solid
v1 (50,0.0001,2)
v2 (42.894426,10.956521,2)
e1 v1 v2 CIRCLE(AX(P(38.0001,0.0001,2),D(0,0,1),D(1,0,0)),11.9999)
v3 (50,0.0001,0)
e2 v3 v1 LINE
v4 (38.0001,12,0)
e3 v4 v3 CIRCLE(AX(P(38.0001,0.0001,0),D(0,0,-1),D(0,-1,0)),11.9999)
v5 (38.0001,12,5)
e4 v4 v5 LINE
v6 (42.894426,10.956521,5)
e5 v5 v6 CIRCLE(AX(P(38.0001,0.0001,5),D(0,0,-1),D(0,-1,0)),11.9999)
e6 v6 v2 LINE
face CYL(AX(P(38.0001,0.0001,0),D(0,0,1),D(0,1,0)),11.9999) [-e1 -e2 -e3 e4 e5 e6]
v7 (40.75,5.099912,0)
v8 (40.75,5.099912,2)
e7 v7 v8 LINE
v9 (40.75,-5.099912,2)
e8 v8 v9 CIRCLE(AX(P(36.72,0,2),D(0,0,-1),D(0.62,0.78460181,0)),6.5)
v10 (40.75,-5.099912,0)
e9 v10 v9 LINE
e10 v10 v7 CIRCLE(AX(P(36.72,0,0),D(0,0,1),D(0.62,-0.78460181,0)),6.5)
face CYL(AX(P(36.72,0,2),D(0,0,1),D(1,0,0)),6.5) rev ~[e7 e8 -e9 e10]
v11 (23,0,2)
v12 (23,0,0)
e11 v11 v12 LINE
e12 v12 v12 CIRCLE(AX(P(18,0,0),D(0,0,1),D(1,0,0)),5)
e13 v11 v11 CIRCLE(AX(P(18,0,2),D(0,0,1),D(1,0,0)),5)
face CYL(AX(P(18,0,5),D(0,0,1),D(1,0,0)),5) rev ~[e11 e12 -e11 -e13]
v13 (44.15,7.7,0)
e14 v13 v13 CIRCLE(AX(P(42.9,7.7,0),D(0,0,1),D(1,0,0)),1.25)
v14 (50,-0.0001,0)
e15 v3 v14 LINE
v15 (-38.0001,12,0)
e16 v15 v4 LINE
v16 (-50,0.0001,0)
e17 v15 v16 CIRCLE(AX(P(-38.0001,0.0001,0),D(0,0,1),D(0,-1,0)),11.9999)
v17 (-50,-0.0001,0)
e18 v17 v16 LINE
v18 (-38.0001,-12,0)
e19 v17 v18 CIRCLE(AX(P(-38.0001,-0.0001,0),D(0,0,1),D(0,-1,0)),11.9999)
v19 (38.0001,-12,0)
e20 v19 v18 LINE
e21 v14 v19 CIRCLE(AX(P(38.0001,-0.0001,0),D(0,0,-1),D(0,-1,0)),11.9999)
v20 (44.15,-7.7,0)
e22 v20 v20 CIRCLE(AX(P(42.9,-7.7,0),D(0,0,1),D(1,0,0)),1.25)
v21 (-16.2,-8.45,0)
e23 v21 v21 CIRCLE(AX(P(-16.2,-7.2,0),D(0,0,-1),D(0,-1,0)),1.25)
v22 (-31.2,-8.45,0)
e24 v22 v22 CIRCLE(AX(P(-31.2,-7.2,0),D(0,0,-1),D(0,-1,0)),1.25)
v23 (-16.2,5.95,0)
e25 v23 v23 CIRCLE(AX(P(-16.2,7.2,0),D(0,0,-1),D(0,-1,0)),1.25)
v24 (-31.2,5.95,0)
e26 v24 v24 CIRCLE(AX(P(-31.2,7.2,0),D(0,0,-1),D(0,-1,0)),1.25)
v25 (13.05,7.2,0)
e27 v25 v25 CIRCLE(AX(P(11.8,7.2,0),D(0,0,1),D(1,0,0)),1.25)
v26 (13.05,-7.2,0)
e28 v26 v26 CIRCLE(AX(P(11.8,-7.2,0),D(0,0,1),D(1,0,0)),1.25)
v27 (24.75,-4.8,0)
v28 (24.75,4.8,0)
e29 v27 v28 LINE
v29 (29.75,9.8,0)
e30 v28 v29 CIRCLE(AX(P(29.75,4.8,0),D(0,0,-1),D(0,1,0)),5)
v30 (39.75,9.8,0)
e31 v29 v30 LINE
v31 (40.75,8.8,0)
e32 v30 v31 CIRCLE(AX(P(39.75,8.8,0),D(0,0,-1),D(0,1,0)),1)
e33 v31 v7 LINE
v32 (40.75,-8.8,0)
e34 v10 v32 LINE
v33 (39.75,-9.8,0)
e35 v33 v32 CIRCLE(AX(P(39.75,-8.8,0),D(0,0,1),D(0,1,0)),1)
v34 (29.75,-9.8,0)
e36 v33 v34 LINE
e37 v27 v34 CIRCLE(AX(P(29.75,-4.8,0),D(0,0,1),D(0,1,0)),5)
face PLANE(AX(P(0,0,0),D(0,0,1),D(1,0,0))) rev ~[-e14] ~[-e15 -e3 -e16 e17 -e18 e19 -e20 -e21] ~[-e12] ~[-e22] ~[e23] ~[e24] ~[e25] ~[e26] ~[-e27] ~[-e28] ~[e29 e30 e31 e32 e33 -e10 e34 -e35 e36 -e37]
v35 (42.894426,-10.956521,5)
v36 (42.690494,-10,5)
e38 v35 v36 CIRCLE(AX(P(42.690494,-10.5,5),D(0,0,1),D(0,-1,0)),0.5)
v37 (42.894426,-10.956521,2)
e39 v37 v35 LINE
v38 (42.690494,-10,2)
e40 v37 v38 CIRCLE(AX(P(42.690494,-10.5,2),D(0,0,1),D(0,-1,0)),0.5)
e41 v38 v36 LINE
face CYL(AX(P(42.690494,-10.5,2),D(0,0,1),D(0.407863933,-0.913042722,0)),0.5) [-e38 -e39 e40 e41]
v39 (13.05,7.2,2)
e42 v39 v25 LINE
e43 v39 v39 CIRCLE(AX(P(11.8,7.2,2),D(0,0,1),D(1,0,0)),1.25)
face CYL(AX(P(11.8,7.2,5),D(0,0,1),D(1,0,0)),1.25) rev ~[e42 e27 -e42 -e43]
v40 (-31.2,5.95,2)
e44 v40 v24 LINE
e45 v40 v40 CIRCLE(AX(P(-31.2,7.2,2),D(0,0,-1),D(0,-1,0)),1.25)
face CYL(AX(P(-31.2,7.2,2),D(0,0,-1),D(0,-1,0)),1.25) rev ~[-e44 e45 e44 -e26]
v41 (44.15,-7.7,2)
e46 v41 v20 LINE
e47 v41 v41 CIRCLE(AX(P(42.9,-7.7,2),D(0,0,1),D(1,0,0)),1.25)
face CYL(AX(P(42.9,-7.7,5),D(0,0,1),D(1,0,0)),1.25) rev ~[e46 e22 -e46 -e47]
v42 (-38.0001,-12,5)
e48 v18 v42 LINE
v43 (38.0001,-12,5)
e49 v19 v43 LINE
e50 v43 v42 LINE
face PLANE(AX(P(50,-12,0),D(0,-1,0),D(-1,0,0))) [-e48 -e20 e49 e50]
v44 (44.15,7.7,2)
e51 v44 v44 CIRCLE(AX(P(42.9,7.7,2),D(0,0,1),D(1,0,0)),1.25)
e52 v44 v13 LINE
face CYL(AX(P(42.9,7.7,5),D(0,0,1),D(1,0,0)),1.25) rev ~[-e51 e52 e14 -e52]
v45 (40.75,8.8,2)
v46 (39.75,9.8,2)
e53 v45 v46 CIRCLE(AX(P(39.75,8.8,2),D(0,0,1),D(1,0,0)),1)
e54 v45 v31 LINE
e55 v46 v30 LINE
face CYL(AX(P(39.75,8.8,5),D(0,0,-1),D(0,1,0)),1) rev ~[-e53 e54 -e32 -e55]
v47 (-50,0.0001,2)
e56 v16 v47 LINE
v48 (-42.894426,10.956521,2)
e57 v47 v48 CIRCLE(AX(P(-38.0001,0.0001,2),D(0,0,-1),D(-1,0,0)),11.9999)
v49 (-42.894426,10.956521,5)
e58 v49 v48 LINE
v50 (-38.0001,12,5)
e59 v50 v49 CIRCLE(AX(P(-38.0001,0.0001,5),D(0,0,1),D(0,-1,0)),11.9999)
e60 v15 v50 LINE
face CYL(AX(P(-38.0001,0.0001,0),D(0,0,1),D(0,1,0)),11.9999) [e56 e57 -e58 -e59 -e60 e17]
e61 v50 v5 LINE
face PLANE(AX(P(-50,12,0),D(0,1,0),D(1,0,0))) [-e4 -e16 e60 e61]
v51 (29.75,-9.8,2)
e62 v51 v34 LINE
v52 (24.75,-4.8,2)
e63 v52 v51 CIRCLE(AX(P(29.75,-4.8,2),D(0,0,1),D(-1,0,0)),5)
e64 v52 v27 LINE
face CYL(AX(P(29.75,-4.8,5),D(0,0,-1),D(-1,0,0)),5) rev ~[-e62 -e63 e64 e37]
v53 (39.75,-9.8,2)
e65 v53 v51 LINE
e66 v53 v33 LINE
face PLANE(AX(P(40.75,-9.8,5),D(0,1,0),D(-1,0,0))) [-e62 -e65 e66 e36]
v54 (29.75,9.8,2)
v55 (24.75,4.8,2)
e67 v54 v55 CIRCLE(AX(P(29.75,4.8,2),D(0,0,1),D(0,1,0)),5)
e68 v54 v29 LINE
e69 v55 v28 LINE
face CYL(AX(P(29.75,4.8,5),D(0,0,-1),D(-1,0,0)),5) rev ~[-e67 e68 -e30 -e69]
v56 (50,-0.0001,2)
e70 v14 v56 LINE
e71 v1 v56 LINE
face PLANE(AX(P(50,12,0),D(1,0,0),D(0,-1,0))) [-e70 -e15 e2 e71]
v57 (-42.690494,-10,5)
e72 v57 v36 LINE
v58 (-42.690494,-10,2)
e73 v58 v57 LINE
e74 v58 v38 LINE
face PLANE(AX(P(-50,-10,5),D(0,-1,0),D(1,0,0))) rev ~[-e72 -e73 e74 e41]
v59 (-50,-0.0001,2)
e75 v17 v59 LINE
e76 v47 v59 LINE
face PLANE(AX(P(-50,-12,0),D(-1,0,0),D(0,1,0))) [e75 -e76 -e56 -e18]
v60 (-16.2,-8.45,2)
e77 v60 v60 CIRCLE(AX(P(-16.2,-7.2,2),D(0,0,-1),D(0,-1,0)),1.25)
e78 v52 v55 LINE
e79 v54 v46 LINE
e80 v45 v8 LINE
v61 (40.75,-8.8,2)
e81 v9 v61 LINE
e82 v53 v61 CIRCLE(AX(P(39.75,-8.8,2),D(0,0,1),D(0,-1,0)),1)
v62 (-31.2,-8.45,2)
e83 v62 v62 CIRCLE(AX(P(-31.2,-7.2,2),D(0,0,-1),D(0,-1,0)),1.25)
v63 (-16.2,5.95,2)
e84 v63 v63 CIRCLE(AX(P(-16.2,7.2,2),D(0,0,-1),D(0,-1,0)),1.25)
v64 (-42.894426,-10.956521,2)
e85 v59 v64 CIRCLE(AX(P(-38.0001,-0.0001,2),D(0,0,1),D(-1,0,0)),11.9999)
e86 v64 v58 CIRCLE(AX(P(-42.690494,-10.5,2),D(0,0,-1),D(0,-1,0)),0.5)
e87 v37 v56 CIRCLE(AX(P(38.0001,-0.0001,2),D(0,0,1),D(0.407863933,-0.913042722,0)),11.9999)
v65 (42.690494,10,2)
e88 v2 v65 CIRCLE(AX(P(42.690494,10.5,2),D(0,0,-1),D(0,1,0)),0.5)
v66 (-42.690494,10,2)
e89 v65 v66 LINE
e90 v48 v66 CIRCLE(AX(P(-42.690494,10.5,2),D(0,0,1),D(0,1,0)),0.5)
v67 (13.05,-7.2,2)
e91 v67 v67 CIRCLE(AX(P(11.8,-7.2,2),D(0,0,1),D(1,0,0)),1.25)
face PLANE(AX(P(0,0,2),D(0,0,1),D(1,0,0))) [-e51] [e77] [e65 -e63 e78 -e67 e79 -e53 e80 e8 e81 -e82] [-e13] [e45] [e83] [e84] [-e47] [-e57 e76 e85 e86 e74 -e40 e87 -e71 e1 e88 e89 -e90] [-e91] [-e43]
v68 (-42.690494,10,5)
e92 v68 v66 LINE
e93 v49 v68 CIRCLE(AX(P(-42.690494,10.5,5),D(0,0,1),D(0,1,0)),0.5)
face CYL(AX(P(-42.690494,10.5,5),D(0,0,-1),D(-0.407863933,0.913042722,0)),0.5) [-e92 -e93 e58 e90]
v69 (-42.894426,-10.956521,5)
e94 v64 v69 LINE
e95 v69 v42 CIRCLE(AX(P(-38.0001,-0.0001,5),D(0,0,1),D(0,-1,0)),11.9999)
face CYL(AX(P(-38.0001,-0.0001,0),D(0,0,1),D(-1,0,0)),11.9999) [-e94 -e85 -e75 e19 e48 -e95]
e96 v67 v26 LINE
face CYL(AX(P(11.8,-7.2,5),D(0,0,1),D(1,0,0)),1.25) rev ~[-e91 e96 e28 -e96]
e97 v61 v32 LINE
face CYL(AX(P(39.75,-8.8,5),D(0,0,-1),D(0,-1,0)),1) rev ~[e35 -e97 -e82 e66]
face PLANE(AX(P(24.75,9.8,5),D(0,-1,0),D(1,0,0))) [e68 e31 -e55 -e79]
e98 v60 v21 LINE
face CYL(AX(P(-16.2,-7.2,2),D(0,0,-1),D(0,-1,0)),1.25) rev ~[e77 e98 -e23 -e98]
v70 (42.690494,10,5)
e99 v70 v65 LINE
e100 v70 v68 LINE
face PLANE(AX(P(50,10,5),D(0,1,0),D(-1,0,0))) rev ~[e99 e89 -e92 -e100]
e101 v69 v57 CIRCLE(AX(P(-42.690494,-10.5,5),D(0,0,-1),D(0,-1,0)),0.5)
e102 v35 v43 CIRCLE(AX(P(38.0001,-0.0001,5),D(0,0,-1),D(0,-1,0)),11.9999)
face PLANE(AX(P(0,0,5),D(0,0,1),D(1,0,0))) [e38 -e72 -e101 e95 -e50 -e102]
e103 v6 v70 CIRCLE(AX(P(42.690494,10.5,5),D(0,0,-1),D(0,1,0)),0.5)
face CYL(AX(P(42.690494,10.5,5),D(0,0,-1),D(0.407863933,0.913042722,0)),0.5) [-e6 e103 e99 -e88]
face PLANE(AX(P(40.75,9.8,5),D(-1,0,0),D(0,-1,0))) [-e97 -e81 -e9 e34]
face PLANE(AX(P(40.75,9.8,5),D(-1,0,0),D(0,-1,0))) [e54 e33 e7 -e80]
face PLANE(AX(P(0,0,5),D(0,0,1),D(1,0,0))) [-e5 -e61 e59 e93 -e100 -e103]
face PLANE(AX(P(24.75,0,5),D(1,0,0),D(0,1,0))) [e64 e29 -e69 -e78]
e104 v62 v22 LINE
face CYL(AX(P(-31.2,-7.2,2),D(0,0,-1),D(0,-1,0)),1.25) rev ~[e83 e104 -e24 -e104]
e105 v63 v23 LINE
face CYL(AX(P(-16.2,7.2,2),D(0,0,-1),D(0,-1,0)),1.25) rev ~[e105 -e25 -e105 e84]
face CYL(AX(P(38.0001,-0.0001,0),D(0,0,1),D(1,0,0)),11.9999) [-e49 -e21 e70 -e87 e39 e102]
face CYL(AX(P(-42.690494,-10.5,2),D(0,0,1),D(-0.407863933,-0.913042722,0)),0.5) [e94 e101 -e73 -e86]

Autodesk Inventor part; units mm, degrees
ref_plane "YZ Plane" through (0, 0, 0) normal (1, 0, 0) x (0, 1, 0)
ref_plane "XZ Plane" through (0, 0, 0) normal (0, 1, 0) x (-1, 0, 0)
ref_plane "XY Plane" through (0, 0, 0) normal (0, 0, 1) x (1, 0, 0)
sketch "スケッチ1" plane through (0, 0, 0) normal (0, 0, 1) x (1, 0, 0)
  line L0 (-50, 12) -> (50, 12)
  line L1 (50, 12) -> (50, -12)
  line L2 (50, -12) -> (-50, -12)
  line L3 (-50, -12) -> (-50, 12)
  point P0 (0, 0)
  dimension "d0" = 100
  dimension "d1" = 24
  dimension "d2" = 12
  dimension "d3" = 50
extrude "押し出し1" add sketch "スケッチ1" along normal blind 5
sketch "スケッチ2" plane through (0, 0, 5) normal (0, 0, 1) x (1, 0, 0)
  line L0 (9.2, 9.8) -> (45, 9.8)
  line L1 (45, 9.8) -> (45, -9.8)
  line L2 (45, -9.8) -> (9.2, -9.8)
  line L3 (9.2, -9.8) -> (9.2, 9.8)
  line L4 (45, 9.8) -> (40.75, 9.8)
  line L5 (40.75, 9.8) -> (40.75, -9.8)
  line L6 (40.75, -9.8) -> (45, -9.8)
  line L7 (45, -9.8) -> (45, 9.8)
  line L8 (40.75, -9.8) -> (24.75, -9.8)
  line L9 (24.75, -9.8) -> (24.75, 9.8)
  line L10 (24.75, 9.8) -> (40.75, 9.8)
  line L11 (40.75, 9.8) -> (40.75, -9.8)
  circle A0 centre (18, 0) radius 5
  line L12 (45, 0) -> (9.2, 0)
  circle A1 centre (11.8, 7.2) radius 1.25
  circle A2 centre (42.9, 7.7) radius 1.25
  circle A3 centre (11.8, -7.2) radius 1.25
  circle A4 centre (42.9, -7.7) radius 1.25
  line L13 (50, 12) -> (50, -12) projected
  point P0 (0, 0)
  dimension "d6" = 35.8
  dimension "d7" = 19.6
  dimension "d8" = 9.8
  dimension "d10" = 4.25
  dimension "d11" = 16
  dimension "d12" = 10
  dimension "d13" = 27
  dimension "d14" = 14.4
  dimension "d15" = 15.4
  dimension "d16" = 31.1
  dimension "d17" = 2.1
  dimension "d18" = 2.5
  dimension "d19" = 2.5
  dimension "d47" = 5
extrude "押し出し2" cut sketch "スケッチ2" against normal through all contours L0 L5 L12 L9 | L12 L5 L2 L9 | L12 A0 | A0 L12 | A1 | A2 | A3 | A4
fillet "フィレット1" radius 5 2 edges at (24.75, 9.8, 2.5) (24.75, -9.8, 2.5)
fillet "フィレット2" radius 1 2 edges at (40.75, 9.8, 2.5) (40.75, -9.8, 2.5)
sketch "スケッチ5" plane through (0, 0, 5) normal (0, 0, 1) x (1, 0, 0)
  line L0 (50, 12) -> (50, -12) projected
  line L1 (39.75, -9.8) -> (29.75, -9.8) projected
  arc A0 (24.75, -4.8) -> (29.75, -9.8) centre (29.75, -4.8) ccw projected
  line L2 (24.75, -4.8) -> (24.75, 4.8) projected
  arc A1 (29.75, 9.8) -> (24.75, 4.8) centre (29.75, 4.8) ccw projected
  line L3 (29.75, 9.8) -> (39.75, 9.8) projected
  arc A2 (40.75, 8.8) -> (39.75, 9.8) centre (39.75, 8.8) ccw projected
  line L4 (40.75, 8.8) -> (40.75, -8.8) projected
  arc A3 (39.75, -9.8) -> (40.75, -8.8) centre (39.75, -8.8) ccw projected
  circle A4 centre (42.9, -7.7) radius 1.25 projected
  circle A5 centre (11.8, -7.2) radius 1.25 projected
  circle A6 centre (42.9, 7.7) radius 1.25 projected
  circle A7 centre (11.8, 7.2) radius 1.25 projected
  circle A8 centre (18, 0) radius 5 projected
  line L5 (50, 10) -> (-50, 10)
  line L6 (-50, 10) -> (-50, -10)
  line L7 (-50, -10) -> (50, -10)
  line L8 (50, -10) -> (50, 10)
  point P0 (-32.5, 14.4762)
  point P1 (-32.5, -14.4762)
  point P2 (0, 0)
  dimension "d41" = 20
  dimension "d42" = 10
  dimension "d49" = 61.8
extrude "押し出し4" cut sketch "スケッチ5" against normal blind 3
fillet "フィレット3" radius 12 4 edges at (50, -12, 2.5) (50, 12, 2.5) (-50, -12, 2.5) (-50, 12, 2.5)
fillet "フィレット4" radius 0.5 4 edges at (-44.6333, -10, 3.5) (-44.6333, 10, 3.5) (44.6333, 10, 3.5) (44.6333, -10, 3.5)
sketch "スケッチ6" plane through (0, 0, 2) normal (0, 0, 1) x (1, 0, 0)
  circle A0 centre (42.9, -7.7) radius 1.25 projected
  circle A1 centre (36.72, 0) radius 6.5
  point P0 (0, 0)
  dimension "d52" = 13
  dimension "d53" = 6.18
extrude "押し出し5" cut sketch "スケッチ6" against normal through all contours A1
sketch "スケッチ7" plane through (0, 0, 2) normal (0, 0, 1) x (1, 0, 0)
  circle A0 centre (11.8, -7.2) radius 1.25 projected
  circle A1 centre (11.8, 7.2) radius 1.25 projected
  point P0 (0, 0)
  point P1 (-16.2, 7.2)
  point P2 (-16.2, -7.2)
  point P3 (-31.2, -7.2)
  point P4 (-31.2, 7.2)
  point P5 (-16.2, 7.2)
  point P6 (-31.2, 7.2)
  dimension "d56" = 15
  dimension "d57" = 15
  dimension "d58" = 28
  dimension "d59" = 28
  dimension "d60" = 7.2
  dimension "d61" = 7.2
  dimension "d62" = 7.2
  dimension "d63" = 7.2
hole "Hole2" at (-16.2, 7.2, 2) at (-16.2, -7.2, 2) at (-31.2, -7.2, 2) at (-31.2, 7.2, 2) direction (0, 0, -1) diameter 2.5 end through all
equation "\"d2\" = 0.5 * d1"
equation "\"d3\" = 0.5 * d0"
equation "\"d8\" = 0.5 * d7"
equation "\"d42\" = 0.5 * d41"
equation "\"d57\" = d56"
equation "\"d59\" = d58"
properties part number "JointC2_"
